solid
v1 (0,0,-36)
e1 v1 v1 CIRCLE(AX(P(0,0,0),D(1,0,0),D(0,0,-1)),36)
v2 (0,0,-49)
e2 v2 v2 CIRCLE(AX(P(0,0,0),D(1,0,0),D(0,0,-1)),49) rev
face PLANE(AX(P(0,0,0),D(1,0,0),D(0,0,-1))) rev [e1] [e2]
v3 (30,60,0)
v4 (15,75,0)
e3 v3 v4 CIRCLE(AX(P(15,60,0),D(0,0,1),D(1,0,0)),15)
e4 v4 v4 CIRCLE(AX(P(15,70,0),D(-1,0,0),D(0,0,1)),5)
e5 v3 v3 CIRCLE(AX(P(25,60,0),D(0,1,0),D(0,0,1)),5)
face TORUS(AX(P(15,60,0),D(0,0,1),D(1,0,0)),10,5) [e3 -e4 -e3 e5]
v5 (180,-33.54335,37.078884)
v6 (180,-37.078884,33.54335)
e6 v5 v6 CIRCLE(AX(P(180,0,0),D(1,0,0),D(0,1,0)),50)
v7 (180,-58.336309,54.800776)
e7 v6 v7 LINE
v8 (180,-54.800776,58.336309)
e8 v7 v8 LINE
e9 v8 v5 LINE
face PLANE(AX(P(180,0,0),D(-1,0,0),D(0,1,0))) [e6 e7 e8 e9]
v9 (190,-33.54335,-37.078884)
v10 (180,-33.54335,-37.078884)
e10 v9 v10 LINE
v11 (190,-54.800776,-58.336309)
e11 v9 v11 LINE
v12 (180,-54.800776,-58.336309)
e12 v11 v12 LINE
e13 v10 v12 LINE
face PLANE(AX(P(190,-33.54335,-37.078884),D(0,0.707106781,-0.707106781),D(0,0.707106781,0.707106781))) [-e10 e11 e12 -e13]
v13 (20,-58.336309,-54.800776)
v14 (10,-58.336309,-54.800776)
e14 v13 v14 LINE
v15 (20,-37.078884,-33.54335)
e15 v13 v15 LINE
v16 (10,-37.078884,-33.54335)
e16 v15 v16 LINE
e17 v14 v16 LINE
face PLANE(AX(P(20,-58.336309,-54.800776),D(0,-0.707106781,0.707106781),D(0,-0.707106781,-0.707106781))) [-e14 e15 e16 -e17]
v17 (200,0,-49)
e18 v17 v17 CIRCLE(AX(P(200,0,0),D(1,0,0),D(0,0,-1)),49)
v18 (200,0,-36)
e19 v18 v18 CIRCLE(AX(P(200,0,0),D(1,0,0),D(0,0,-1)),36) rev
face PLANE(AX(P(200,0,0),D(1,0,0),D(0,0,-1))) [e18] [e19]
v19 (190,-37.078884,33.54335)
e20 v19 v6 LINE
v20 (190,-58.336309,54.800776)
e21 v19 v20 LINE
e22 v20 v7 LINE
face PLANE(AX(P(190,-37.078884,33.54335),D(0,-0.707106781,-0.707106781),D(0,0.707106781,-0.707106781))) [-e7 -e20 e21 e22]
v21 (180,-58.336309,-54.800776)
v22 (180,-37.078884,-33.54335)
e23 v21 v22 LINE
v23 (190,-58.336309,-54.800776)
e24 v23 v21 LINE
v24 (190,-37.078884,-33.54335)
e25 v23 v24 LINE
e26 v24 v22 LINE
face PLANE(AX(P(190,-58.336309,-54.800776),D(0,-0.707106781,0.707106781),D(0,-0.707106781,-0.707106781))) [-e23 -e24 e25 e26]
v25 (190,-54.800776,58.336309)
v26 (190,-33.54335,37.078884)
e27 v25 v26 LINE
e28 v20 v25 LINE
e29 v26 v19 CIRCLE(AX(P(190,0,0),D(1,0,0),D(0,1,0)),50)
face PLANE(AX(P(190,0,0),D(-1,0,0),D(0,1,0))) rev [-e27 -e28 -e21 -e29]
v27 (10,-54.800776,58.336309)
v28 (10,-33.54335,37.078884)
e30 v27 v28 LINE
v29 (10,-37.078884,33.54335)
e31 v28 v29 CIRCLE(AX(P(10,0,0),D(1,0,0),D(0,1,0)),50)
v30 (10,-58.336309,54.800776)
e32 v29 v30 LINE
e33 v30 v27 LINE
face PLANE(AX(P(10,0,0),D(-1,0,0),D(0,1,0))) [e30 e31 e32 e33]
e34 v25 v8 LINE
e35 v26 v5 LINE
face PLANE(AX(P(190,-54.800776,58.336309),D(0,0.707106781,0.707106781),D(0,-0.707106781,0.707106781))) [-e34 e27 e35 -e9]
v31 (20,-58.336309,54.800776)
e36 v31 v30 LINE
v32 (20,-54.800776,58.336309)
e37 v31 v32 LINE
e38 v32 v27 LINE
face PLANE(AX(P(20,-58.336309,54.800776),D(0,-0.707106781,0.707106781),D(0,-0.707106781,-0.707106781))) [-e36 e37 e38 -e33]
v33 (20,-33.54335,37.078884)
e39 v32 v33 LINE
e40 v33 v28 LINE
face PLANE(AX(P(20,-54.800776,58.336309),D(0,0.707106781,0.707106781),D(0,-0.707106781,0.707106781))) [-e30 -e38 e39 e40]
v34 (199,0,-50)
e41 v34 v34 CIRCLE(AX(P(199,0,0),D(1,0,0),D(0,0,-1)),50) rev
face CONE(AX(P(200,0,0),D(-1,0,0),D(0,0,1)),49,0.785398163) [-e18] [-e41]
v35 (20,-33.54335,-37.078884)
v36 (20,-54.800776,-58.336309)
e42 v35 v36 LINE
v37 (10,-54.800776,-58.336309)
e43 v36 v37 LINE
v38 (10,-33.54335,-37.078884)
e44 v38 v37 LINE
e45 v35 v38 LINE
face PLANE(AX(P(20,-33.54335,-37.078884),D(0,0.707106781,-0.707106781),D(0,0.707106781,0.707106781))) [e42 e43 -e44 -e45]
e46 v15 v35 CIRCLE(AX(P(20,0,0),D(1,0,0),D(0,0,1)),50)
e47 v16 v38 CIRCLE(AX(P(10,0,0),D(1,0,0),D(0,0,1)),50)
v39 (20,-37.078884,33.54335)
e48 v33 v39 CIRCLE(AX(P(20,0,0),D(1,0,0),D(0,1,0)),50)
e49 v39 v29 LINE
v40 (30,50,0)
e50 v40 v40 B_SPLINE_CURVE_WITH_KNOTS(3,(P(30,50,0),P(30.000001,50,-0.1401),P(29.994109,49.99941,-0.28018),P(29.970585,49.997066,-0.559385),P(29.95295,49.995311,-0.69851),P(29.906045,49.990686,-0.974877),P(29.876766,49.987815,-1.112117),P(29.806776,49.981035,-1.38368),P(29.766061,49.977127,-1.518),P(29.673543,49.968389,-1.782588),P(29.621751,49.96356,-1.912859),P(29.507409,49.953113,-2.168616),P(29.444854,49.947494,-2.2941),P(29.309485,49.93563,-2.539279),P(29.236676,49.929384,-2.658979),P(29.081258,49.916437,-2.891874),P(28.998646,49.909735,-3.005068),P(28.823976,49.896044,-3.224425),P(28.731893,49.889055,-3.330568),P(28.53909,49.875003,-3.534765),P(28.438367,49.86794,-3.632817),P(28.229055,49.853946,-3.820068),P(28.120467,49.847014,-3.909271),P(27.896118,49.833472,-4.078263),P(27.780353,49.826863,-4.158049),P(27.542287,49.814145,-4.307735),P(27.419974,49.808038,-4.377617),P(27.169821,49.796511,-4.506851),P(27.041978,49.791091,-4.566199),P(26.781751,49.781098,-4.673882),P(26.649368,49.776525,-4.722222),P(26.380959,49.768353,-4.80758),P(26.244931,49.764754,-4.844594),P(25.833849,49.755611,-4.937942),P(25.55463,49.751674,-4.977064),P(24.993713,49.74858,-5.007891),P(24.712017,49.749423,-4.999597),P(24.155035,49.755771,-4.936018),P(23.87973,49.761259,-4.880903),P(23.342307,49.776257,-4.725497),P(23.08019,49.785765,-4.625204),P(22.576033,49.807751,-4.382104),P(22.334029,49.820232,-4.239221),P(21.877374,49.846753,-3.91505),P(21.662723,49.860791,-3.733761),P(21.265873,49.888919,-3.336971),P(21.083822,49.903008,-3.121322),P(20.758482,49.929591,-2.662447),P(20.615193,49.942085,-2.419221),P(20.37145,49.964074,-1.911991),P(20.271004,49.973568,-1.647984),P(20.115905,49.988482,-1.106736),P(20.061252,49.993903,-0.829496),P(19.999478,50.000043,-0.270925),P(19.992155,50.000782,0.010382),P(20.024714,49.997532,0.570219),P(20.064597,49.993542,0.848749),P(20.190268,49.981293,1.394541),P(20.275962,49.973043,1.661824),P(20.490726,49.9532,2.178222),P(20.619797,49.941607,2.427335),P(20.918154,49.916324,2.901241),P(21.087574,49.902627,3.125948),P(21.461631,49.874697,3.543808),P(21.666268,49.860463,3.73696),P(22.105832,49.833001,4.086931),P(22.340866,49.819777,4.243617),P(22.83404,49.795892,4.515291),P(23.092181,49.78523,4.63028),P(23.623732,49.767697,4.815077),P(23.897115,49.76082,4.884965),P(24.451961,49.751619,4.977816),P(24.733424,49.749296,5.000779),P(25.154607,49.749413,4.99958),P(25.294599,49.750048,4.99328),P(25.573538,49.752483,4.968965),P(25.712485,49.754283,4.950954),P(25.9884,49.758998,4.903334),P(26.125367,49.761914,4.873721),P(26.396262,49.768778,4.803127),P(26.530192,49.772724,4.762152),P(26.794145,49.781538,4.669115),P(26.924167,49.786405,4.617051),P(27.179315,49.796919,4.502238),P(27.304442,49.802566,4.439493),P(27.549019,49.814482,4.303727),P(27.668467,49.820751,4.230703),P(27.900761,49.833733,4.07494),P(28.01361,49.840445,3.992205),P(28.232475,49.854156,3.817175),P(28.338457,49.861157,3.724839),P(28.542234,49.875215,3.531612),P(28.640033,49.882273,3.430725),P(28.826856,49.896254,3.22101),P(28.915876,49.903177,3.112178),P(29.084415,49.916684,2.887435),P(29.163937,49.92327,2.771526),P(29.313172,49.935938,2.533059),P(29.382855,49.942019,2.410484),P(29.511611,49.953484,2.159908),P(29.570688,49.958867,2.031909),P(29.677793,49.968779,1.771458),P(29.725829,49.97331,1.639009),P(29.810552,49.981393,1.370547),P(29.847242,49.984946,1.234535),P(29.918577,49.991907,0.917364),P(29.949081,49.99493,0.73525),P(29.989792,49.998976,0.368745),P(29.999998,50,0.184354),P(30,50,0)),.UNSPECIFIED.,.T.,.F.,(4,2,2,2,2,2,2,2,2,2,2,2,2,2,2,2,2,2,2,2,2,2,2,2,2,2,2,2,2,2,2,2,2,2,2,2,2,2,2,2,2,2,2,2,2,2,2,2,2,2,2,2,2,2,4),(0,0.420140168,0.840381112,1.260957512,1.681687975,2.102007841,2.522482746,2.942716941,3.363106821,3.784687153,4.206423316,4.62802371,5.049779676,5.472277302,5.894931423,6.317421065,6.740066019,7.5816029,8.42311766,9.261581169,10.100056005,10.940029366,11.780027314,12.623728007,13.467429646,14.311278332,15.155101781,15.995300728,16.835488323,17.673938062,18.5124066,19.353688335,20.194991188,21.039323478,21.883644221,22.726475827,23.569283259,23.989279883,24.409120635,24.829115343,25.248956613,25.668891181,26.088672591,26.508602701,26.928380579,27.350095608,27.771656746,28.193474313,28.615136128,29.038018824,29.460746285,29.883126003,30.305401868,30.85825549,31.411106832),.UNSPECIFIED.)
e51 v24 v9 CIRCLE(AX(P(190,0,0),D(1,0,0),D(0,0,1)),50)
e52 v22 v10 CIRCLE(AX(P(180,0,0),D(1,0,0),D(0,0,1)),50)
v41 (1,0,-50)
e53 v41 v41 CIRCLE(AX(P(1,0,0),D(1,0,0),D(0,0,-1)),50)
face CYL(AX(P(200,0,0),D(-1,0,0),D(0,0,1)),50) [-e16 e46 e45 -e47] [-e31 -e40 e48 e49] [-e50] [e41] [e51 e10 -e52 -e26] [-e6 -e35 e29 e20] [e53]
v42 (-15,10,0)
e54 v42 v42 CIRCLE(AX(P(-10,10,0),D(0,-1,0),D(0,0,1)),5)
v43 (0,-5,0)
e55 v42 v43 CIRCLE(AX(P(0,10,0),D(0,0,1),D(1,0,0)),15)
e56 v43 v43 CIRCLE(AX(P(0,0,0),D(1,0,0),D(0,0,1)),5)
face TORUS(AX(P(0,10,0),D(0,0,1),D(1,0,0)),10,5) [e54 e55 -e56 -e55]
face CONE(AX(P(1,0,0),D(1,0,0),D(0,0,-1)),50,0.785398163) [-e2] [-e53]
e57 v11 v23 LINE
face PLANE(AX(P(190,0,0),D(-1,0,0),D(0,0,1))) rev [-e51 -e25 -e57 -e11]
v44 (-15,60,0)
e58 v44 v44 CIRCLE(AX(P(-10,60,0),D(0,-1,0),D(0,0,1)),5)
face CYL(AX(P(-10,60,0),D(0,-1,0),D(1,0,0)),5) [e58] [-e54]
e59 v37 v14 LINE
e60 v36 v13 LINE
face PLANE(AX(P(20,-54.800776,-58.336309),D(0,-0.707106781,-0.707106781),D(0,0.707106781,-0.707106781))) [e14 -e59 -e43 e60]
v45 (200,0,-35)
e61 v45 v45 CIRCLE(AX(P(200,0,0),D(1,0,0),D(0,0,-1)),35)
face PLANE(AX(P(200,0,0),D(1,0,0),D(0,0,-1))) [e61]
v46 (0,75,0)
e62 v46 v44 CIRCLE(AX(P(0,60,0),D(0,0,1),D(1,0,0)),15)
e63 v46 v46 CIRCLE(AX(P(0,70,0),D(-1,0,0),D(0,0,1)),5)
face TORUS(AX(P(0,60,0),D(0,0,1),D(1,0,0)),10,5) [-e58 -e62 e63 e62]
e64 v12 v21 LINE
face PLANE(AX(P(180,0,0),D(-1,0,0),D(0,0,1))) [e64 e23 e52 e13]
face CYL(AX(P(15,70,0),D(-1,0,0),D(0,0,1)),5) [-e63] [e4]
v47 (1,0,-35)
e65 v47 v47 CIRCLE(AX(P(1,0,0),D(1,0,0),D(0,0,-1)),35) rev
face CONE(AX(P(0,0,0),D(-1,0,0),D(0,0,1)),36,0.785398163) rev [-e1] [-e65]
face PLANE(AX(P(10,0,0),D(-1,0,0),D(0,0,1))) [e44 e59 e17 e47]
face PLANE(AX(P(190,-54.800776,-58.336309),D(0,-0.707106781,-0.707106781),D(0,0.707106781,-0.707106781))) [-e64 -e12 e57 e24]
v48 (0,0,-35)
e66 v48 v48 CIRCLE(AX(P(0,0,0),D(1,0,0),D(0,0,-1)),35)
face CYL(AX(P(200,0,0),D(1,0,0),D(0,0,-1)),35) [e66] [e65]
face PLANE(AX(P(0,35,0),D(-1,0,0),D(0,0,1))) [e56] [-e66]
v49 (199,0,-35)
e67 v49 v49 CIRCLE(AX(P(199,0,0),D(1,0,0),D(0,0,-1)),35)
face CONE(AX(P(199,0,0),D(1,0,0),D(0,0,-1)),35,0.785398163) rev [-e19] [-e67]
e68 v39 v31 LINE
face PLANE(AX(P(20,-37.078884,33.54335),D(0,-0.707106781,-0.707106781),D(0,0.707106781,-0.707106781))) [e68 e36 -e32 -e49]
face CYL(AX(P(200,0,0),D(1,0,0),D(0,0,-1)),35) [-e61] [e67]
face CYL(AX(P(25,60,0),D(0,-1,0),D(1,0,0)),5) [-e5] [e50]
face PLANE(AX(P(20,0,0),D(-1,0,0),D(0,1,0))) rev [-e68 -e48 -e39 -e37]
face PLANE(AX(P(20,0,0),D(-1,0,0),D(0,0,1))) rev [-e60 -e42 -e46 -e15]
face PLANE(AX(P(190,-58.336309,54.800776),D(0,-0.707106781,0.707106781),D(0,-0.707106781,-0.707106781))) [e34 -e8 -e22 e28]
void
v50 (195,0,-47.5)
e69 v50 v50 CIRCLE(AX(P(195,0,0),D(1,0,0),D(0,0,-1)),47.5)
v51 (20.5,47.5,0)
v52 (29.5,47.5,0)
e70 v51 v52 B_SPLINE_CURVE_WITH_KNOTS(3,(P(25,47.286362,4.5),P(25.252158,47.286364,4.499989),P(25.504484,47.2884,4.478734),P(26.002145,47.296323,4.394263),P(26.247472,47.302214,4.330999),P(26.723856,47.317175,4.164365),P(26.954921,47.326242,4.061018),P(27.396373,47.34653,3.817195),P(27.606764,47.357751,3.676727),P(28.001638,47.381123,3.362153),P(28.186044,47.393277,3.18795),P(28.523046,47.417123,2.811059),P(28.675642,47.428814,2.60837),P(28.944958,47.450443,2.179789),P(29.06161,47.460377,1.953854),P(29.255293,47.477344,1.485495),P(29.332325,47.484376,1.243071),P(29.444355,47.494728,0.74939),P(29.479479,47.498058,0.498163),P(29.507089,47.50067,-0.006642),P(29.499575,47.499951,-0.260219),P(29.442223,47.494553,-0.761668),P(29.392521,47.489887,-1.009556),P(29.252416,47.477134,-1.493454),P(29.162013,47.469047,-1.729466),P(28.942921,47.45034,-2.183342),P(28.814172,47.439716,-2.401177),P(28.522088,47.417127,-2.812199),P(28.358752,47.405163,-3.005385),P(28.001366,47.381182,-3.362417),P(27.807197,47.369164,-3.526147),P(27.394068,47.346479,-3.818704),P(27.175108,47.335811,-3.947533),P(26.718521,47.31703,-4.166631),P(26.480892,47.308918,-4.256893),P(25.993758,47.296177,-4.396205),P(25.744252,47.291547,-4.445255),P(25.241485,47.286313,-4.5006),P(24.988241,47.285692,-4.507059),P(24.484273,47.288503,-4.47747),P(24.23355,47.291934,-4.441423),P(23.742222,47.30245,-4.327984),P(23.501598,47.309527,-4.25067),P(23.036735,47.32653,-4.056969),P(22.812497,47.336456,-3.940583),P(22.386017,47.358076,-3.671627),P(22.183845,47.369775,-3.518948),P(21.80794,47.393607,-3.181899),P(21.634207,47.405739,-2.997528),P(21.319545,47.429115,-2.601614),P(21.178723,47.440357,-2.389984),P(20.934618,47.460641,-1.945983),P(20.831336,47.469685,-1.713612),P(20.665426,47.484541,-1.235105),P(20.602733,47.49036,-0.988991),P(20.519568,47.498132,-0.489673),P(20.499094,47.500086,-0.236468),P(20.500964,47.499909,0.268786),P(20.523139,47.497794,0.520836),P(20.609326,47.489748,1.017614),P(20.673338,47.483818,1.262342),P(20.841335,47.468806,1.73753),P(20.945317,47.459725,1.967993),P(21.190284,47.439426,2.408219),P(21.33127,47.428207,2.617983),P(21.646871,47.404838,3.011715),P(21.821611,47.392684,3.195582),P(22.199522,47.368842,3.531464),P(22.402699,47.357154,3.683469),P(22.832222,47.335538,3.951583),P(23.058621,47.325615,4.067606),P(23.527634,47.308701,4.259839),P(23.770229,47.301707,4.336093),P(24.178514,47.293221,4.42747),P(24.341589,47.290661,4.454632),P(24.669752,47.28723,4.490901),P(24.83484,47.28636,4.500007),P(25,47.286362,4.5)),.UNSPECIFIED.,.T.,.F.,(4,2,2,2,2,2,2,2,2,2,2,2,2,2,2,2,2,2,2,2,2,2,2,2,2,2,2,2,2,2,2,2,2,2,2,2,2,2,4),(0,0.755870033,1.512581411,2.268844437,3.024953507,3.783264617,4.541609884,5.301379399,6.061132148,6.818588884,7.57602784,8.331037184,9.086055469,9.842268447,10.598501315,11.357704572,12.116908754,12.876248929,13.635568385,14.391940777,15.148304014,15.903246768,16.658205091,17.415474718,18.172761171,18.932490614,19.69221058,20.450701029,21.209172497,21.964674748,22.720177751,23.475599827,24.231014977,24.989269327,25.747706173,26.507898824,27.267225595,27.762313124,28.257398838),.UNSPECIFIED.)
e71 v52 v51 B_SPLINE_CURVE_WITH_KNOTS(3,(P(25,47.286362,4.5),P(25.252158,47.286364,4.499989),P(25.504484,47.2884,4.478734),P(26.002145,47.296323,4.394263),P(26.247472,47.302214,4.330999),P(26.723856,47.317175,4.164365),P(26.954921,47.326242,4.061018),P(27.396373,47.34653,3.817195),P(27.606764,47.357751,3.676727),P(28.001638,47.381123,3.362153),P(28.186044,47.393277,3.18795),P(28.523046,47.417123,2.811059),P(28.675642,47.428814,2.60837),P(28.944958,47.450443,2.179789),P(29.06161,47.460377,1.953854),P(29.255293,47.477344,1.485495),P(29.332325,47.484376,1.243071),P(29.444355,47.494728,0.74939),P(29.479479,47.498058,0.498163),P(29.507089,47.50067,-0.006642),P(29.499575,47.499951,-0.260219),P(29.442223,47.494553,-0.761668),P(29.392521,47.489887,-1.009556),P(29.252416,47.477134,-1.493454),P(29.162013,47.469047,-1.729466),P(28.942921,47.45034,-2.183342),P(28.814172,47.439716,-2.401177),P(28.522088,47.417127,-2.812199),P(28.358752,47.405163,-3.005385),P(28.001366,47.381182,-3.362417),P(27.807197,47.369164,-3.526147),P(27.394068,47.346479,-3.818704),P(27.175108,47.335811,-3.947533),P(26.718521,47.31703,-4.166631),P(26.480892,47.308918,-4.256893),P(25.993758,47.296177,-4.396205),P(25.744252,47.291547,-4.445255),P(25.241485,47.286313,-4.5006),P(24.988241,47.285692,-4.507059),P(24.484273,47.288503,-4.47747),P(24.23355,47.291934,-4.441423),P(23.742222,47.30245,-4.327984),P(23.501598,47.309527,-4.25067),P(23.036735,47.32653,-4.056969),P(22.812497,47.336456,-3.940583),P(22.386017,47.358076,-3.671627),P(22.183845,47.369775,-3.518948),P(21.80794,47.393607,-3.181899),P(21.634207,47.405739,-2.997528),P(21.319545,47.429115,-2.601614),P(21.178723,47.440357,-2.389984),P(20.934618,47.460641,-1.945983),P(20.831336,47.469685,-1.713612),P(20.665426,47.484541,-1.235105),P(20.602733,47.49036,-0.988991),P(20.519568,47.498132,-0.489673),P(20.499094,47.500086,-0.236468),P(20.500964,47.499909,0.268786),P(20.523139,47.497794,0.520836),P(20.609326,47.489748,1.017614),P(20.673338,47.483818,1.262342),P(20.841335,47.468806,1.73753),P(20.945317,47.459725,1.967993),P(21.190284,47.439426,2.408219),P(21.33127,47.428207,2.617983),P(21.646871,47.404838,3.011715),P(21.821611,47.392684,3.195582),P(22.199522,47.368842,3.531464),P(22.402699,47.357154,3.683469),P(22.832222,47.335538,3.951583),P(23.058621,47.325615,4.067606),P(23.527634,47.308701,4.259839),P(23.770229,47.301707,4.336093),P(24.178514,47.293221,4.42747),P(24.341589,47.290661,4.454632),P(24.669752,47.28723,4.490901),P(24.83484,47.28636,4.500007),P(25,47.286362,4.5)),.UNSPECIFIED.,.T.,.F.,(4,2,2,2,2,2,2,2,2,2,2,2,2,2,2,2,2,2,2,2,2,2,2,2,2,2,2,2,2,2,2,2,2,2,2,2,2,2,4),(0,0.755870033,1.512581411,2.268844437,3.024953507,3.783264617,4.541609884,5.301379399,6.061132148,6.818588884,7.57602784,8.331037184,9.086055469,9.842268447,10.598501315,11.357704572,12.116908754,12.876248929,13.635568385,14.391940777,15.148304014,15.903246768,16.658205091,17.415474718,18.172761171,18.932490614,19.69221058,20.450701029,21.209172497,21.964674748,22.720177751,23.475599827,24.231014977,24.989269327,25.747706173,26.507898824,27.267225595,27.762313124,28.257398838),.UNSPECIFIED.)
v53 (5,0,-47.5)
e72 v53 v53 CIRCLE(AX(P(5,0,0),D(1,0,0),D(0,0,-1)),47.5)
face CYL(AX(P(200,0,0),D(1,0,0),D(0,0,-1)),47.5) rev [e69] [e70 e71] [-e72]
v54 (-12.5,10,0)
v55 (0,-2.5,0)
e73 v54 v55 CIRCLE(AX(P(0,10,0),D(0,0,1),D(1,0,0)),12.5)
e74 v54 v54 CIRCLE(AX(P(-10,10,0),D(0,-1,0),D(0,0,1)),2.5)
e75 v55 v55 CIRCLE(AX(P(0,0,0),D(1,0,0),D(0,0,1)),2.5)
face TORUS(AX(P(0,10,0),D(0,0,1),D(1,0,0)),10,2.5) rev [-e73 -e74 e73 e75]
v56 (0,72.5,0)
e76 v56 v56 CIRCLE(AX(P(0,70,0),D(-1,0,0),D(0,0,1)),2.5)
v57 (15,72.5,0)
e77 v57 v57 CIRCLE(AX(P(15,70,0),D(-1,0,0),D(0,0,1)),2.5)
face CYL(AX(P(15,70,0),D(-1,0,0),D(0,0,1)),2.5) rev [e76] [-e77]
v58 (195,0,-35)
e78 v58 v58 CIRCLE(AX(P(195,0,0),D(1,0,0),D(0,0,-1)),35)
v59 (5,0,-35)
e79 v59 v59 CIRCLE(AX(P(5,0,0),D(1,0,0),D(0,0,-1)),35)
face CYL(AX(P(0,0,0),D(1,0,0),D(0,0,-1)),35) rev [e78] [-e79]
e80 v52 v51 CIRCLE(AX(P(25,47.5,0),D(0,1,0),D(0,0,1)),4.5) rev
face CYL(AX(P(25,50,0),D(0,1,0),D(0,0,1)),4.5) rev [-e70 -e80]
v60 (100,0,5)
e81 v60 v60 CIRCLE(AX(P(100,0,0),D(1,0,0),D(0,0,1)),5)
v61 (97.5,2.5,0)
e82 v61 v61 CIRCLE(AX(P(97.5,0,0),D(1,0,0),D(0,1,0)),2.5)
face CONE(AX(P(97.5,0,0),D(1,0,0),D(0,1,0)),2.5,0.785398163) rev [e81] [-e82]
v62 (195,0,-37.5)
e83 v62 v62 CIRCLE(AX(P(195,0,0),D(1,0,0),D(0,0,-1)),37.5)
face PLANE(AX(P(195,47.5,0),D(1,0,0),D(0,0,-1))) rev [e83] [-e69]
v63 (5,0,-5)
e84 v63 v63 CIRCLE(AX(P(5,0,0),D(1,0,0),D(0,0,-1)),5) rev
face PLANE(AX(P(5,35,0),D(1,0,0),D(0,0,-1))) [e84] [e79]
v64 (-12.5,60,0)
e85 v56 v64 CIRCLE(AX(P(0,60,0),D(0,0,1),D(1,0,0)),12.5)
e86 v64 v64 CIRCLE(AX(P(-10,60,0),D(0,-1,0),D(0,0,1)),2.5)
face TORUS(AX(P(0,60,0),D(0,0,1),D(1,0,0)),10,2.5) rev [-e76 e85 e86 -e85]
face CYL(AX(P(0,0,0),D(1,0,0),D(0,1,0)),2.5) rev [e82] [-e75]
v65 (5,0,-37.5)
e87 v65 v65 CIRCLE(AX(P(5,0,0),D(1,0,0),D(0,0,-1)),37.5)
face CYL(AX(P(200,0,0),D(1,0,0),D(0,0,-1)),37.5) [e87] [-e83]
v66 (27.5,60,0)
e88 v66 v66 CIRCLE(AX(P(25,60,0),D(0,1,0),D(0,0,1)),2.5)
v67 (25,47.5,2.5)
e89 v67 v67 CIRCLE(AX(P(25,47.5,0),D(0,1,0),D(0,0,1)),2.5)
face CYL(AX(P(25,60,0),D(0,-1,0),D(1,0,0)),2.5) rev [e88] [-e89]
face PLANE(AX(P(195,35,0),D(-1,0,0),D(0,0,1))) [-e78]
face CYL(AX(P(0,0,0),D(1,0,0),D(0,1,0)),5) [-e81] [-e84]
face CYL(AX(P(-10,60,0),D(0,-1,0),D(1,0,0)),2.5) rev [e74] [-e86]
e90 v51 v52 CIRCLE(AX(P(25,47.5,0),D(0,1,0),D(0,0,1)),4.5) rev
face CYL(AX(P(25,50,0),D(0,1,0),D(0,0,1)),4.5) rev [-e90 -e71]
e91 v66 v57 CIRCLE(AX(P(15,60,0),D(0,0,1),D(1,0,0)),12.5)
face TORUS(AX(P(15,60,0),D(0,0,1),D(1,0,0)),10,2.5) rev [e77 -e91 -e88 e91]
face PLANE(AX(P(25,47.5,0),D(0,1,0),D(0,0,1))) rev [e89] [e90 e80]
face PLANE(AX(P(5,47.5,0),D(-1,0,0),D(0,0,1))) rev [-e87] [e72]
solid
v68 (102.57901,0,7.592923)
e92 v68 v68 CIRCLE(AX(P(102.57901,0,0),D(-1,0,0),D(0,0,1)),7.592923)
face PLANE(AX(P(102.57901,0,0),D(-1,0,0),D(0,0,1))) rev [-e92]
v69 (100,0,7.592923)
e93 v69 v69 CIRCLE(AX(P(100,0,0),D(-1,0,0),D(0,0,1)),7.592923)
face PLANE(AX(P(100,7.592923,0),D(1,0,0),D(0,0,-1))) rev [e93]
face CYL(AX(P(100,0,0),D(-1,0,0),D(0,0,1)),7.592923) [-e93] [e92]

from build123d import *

# Parameters (mm, degrees)
ESBO_O1_R                                     = 50
RESSALTO_EXTRUS_O1_DEPTH                      = 200
ESBO_O2_R                                     = 35
CORTE_EXTRUS_O1_DEPTH                         = 200
ESBO_O3_W                                     = 190
ESBO_O3_H                                     = 10
CHANFRO1_SIZE                                 = 1
RESSALTO_EXTRUS_O2_DEPTH                      = 10
PADR_OCIRCULAR1_COUNT                         = 2
PADR_OCIRCULAR1_ANGLE                         = 90
PADR_O_LINEAR1_COUNT                          = 2
PADR_O_LINEAR1_PITCH                          = 170
PADR_O_LINEAR1_COPY_1_DEPTH                   = 10
BROCA_DE_ROSQUEAR_PARA_TARRAXA_DE_M10X1_REACH = 236.819
BROCA_DE_ROSQUEAR_PARA_TARRAXA_DE_M1_2_R      = 4.5
ESBO_O9_R                                     = 5
ESBO_O9_R_2                                   = 2.5
CHANFRO2_SIZE                                 = 2.5
ESBO_O10_W                                    = 5
ESBO_O10_H                                    = 35
ESBO_O14_W                                    = 5
ESBO_O14_H                                    = 30
SKETCH1_W                                     = 2.57901042
SKETCH1_H                                     = 7.592922652


with BuildPart() as part:
    # Esboço1 → Ressalto-extrusão1 (new body)
    with BuildSketch(Plane(origin=(0, 0, 0), x_dir=(0, 0, -1), z_dir=(1, 0, 0))):
        Circle(ESBO_O1_R)
    extrude(amount=RESSALTO_EXTRUS_O1_DEPTH)

    # Esboço2 → Corte-extrusão1 (cut)
    with BuildSketch(Plane(origin=(200, 0, 0), x_dir=(0, 0, -1), z_dir=(1, 0, 0))):
        Circle(ESBO_O2_R)
    extrude(amount=-CORTE_EXTRUS_O1_DEPTH, mode=Mode.SUBTRACT)

    # Esboço3 → Corte-Revolução1 (revolve, cut)
    with BuildSketch(Plane.XY, mode=Mode.PRIVATE) as corte_revolu_o1_sk:
        with Locations((100, 42.5)):
            Rectangle(ESBO_O3_W, ESBO_O3_H)
    revolve(corte_revolu_o1_sk.sketch.rotate(Axis((200, 0, 0), (-1, 0, 0)), 90), axis=Axis((200, 0, 0), (-1, 0, 0)), mode=Mode.SUBTRACT)

    # Chanfro1
    chanfro1_edges = [part.edges().sort_by_distance(p)[0] for p in [
        (0, 0, 50),
        (200, 0, 50),
        (0, 0, 35),
        (200, 0, 35),
    ]]
    chamfer(chanfro1_edges, length=CHANFRO1_SIZE)

    # Esboço4 → Ressalto-extrusão2 (add)
    with BuildSketch(Plane.ZY.offset(-10)):
        with BuildLine():
            Line((-37.078884183, -33.543350277), (-58.336309448, -54.800775542))
            Line((-58.336309448, -54.800775542), (-54.800775542, -58.336309448))
            Line((-54.800775542, -58.336309448), (-33.543350277, -37.078884183))
            ThreePointArc((-33.543350277, -37.078884183), (-35.355339059, -35.355339059), (-37.078884183, -33.543350277))
        make_face()
    ressalto_extrus_o2 = extrude(amount=-RESSALTO_EXTRUS_O2_DEPTH)

    # PadrãoCircular1: Ressalto-extrusão2 ×2 about axis
    padr_ocircular1_axis = Axis((0, 0, 0), (-1, 0, 0))
    for i in range(1, PADR_OCIRCULAR1_COUNT):
        add(ressalto_extrus_o2.rotate(padr_ocircular1_axis, i * PADR_OCIRCULAR1_ANGLE / (PADR_OCIRCULAR1_COUNT - 1)))

    # Padrão linear1: Ressalto-extrusão2 ×2
    with Locations(*[(i * PADR_O_LINEAR1_PITCH, 0, 0) for i in range(1, PADR_O_LINEAR1_COUNT)]):
        add(ressalto_extrus_o2)

    # Padrão linear1 copy 1 sketch → Padrão linear1 copy 1 (add)
    with BuildSketch(Plane(origin=(180, 0, 0), x_dir=(0, 1, 0), z_dir=(-1, 0, 0))):
        with BuildLine():
            Line((-37.078884183, -33.543350277), (-58.336309448, -54.800775542))
            Line((-58.336309448, -54.800775542), (-54.800775542, -58.336309448))
            Line((-54.800775542, -58.336309448), (-33.543350277, -37.078884183))
            ThreePointArc((-33.543350277, -37.078884183), (-35.355339059, -35.355339059), (-37.078884183, -33.543350277))
        make_face()
    extrude(amount=-PADR_O_LINEAR1_COPY_1_DEPTH)

    # Broca de rosquear para tarraxa de M1 2 → Broca de rosquear para tarraxa de M10x1.01 (cut, up to next)
    with BuildSketch(Plane(origin=(0, 50, 0), x_dir=(-1, 0, 0), z_dir=(0, 1, 0)), mode=Mode.PRIVATE) as broca_de_rosquear_para_tarraxa_de_m10x1_sk1:
        with Locations((-25, 0)):
            Circle(BROCA_DE_ROSQUEAR_PARA_TARRAXA_DE_M1_2_R)
    broca_de_rosquear_para_tarraxa_de_m10x1_tool1 = extrude(broca_de_rosquear_para_tarraxa_de_m10x1_sk1.sketch, amount=-BROCA_DE_ROSQUEAR_PARA_TARRAXA_DE_M10X1_REACH, mode=Mode.PRIVATE) & part.part
    add(broca_de_rosquear_para_tarraxa_de_m10x1_tool1.solids().sort_by_distance((25, 50, 0))[0], mode=Mode.SUBTRACT)

    # Varredura1: sweep along a path in Esboço8
    with BuildLine(Plane.XY) as varredura1_path:
        Line((25, 47.5), (25, 60))
        ThreePointArc((25, 60), (22.071067812, 67.071067812), (15, 70))
        Line((15, 70), (0, 70))
        ThreePointArc((0, 70), (-7.071067812, 67.071067812), (-10, 60))
        Line((-10, 60), (-10, 10))
        ThreePointArc((-10, 10), (-7.071067812, 2.928932188), (0, 0))
        Line((0, 0), (100, 0))
    # Esboço9 → Varredura1 (sweep)
    with BuildSketch(Plane(origin=(0, 47.5, 0), x_dir=(-1, 0, 0), z_dir=(0, 1, 0))):
        with Locations((-25, 0)):
            Circle(ESBO_O9_R)
        with Locations((-25, 0)):
            Circle(ESBO_O9_R_2, mode=Mode.SUBTRACT)
    sweep(path=varredura1_path.line)

    # Chanfro2
    chanfro2_edges = [part.edges().sort_by_distance(p)[0] for p in [
        (100, -2.5, 0),
    ]]
    chamfer(chanfro2_edges, length=CHANFRO2_SIZE - 0.0001)  # a hair under: the kernel refuses the full size

    # Esboço10 → Revolução1 (revolve)
    with BuildSketch(Plane.XY):
        with Locations((197.5, 17.5)):
            Rectangle(ESBO_O10_W, ESBO_O10_H)
    revolve(axis=Axis((200, 0, 0), (-1, 0, 0)))

    # Esboço14 → Revolução2 (revolve)
    with BuildSketch(Plane.XY, mode=Mode.PRIVATE) as revolu_o2_sk:
        with Locations((2.5, 20)):
            Rectangle(ESBO_O14_W, ESBO_O14_H)
    revolve(revolu_o2_sk.sketch.rotate(Axis((200, 0, 0), (-1, 0, 0)), 90), axis=Axis((200, 0, 0), (-1, 0, 0)))


with BuildPart() as body_2:
    # Sketch1 → Revolve2 (revolve)
    with BuildSketch(Plane.XY):
        with Locations((101.28950521, 3.796461326)):
            Rectangle(SKETCH1_W, SKETCH1_H)
    revolve(axis=Axis((100, 0, 0), (1, 0, 0)))


solid = Compound([part.part, body_2.part])
